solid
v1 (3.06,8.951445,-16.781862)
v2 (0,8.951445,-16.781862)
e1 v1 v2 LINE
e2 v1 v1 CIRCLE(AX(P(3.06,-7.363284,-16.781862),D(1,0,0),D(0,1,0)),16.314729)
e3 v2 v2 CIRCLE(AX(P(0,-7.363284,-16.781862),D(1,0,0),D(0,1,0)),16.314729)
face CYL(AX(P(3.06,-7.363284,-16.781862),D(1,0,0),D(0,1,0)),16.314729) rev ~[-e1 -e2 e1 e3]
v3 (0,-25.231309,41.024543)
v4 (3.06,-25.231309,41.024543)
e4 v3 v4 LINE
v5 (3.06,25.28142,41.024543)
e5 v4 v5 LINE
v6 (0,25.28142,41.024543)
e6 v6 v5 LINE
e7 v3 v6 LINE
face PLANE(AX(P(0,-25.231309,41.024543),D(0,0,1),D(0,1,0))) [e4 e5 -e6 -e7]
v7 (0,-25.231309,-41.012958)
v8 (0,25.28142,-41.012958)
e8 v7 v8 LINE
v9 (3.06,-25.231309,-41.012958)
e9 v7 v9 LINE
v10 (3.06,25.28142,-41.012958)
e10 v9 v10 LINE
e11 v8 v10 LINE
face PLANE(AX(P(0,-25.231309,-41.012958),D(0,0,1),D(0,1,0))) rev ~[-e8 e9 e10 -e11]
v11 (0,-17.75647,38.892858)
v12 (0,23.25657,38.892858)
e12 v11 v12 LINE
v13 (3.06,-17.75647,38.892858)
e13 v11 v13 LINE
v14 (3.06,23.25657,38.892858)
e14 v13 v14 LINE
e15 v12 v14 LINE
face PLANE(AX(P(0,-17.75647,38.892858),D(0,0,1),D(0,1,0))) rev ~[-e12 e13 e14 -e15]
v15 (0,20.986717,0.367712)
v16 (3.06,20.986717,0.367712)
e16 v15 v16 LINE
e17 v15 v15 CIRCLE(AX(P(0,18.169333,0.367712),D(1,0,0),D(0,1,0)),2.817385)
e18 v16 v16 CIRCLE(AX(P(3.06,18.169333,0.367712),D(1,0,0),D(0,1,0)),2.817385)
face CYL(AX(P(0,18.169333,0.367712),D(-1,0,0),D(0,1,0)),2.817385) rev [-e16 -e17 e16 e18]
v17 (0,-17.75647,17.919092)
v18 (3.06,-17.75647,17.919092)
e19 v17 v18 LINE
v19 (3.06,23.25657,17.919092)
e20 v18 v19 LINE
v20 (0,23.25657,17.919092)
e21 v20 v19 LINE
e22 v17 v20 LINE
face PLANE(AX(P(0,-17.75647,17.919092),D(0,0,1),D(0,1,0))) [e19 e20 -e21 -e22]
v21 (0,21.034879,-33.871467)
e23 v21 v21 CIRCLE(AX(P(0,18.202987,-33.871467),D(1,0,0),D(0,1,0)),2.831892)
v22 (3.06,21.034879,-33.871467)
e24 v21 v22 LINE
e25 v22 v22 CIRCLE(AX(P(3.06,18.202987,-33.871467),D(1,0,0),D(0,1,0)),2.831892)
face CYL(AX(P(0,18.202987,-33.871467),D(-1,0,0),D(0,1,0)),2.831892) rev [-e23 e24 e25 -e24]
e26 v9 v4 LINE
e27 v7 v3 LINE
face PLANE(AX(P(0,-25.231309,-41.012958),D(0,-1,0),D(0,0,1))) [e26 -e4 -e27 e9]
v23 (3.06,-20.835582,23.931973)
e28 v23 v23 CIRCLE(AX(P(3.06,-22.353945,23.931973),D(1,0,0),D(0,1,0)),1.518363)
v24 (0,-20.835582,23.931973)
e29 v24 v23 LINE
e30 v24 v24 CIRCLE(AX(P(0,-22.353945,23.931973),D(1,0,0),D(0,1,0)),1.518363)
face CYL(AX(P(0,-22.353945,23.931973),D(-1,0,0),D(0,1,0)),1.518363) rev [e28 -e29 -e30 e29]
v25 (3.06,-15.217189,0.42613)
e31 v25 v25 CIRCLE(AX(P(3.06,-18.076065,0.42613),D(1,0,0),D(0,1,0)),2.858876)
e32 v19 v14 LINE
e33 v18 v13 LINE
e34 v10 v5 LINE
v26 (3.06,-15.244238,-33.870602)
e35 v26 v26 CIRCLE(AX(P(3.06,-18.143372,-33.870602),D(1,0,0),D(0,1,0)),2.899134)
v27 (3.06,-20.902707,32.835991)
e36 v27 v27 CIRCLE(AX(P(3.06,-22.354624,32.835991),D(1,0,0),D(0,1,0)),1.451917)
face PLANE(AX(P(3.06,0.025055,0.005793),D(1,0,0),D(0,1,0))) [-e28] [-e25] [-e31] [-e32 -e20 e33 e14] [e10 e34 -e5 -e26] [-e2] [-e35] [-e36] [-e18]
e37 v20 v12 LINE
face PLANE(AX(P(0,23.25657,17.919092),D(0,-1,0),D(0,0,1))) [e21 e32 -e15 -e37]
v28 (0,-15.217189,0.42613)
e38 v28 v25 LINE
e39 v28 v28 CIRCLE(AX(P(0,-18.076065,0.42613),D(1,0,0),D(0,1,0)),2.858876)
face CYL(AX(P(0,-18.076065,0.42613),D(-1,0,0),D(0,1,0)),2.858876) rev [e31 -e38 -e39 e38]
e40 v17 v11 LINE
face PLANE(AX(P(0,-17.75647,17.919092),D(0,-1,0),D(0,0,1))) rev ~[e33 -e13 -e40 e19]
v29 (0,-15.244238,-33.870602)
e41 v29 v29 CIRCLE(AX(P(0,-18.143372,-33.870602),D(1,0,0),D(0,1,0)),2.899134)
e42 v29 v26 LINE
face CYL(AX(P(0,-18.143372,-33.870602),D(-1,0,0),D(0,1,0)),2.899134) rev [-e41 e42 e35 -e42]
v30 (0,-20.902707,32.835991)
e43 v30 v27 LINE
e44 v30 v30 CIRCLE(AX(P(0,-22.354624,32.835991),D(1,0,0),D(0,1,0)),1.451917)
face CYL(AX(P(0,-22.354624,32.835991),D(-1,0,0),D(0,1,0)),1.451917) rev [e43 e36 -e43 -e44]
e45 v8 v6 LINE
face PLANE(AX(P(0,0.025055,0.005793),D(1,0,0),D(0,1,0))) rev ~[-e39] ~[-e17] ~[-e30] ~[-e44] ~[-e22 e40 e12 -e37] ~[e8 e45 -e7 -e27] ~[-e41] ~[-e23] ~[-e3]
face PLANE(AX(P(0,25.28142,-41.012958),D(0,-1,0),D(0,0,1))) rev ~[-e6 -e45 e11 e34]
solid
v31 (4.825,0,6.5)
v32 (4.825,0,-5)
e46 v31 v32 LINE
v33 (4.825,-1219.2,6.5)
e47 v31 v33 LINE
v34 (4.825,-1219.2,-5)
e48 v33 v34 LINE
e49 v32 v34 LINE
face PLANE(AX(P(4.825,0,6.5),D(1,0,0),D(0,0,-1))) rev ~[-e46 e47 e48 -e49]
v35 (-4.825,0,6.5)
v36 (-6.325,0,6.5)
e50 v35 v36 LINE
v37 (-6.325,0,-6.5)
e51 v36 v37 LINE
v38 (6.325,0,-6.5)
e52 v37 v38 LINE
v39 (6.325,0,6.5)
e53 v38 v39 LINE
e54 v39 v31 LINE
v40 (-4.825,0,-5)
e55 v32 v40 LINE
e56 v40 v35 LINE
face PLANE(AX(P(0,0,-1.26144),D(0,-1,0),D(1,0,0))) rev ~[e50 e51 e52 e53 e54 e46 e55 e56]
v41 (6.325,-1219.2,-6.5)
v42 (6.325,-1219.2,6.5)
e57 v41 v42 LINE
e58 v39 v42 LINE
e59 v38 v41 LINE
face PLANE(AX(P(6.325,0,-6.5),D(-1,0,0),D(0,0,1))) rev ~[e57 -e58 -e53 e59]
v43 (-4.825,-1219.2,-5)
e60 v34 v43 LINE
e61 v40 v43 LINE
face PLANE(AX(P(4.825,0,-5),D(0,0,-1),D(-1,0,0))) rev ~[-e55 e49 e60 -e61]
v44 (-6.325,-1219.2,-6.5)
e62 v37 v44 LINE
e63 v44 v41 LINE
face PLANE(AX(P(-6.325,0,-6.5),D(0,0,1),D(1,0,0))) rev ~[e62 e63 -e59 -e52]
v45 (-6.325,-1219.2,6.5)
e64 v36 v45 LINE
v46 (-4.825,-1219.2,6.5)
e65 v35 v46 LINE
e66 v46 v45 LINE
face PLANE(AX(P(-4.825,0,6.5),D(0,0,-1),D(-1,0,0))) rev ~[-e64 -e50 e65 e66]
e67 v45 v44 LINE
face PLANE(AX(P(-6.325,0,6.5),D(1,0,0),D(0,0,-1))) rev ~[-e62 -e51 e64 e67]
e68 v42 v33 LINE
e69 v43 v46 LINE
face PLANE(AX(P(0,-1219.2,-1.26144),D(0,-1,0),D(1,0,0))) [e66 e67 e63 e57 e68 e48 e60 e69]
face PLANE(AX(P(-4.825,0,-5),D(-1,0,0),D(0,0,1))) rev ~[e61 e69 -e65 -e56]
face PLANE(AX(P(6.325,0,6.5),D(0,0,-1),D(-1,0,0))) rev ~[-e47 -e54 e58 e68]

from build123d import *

# Parameters (mm, degrees)
F1_DEPTH = 1219.2
F2_W     = 50.5127292126
F2_H     = 82.0375010371
F2_R     = 2.89913405
F2_R_2   = 2.8318920873
F2_R_3   = 2.8588761336
F2_R_4   = 1.5183628154
F2_R_5   = 1.4519166982
F2_R_6   = 2.8173846153
F2_W_2   = 41.0130396485
F2_H_2   = 20.9737662226
F3_DEPTH = 3.06
F5_R     = 16.3147290841
F6_DEPTH = 5


with BuildPart() as f1:
    # F0 (on Front) → F1 (new body)
    with BuildSketch(Plane.XZ):
        Polygon((-4.825, 6.5), (-6.325, 6.5), (-6.325, -6.5), (6.325, -6.5), (6.325, 6.5), (4.825, 6.5), (4.825, -5), (-4.825, -5), align=None)
    extrude(amount=F1_DEPTH)


with BuildPart() as f3:
    # F2 (on Right) → F3 (new body)
    with BuildSketch(Plane.YZ):
        with Locations((0.0250553712, 0.0057928264)):
            Rectangle(F2_W, F2_H)
        with Locations((-18.1433722998, -33.8706020266)):
            Circle(F2_R, mode=Mode.SUBTRACT)
        with Locations((18.2029870339, -33.8714673854)):
            Circle(F2_R_2, mode=Mode.SUBTRACT)
        with Locations((-18.0760649964, 0.4261299481)):
            Circle(F2_R_3, mode=Mode.SUBTRACT)
        with Locations((-22.3539447378, 23.9319726942)):
            Circle(F2_R_4, mode=Mode.SUBTRACT)
        with Locations((-22.3546241195, 32.8359914765)):
            Circle(F2_R_5, mode=Mode.SUBTRACT)
        with Locations((18.1693327613, 0.3677118686)):
            Circle(F2_R_6, mode=Mode.SUBTRACT)
        with Locations((2.7500502765, 28.4059746191)):
            Rectangle(F2_W_2, F2_H_2, mode=Mode.SUBTRACT)
    extrude(amount=F3_DEPTH)

    # F5 (on face) → F6 (cut)
    with BuildSketch(Plane.YZ.offset(3.06)):
        with Locations((-7.363283649, -16.781862238)):
            Circle(F5_R)
    extrude(amount=-F6_DEPTH, mode=Mode.SUBTRACT)


solid = Compound([f1.part, f3.part])
